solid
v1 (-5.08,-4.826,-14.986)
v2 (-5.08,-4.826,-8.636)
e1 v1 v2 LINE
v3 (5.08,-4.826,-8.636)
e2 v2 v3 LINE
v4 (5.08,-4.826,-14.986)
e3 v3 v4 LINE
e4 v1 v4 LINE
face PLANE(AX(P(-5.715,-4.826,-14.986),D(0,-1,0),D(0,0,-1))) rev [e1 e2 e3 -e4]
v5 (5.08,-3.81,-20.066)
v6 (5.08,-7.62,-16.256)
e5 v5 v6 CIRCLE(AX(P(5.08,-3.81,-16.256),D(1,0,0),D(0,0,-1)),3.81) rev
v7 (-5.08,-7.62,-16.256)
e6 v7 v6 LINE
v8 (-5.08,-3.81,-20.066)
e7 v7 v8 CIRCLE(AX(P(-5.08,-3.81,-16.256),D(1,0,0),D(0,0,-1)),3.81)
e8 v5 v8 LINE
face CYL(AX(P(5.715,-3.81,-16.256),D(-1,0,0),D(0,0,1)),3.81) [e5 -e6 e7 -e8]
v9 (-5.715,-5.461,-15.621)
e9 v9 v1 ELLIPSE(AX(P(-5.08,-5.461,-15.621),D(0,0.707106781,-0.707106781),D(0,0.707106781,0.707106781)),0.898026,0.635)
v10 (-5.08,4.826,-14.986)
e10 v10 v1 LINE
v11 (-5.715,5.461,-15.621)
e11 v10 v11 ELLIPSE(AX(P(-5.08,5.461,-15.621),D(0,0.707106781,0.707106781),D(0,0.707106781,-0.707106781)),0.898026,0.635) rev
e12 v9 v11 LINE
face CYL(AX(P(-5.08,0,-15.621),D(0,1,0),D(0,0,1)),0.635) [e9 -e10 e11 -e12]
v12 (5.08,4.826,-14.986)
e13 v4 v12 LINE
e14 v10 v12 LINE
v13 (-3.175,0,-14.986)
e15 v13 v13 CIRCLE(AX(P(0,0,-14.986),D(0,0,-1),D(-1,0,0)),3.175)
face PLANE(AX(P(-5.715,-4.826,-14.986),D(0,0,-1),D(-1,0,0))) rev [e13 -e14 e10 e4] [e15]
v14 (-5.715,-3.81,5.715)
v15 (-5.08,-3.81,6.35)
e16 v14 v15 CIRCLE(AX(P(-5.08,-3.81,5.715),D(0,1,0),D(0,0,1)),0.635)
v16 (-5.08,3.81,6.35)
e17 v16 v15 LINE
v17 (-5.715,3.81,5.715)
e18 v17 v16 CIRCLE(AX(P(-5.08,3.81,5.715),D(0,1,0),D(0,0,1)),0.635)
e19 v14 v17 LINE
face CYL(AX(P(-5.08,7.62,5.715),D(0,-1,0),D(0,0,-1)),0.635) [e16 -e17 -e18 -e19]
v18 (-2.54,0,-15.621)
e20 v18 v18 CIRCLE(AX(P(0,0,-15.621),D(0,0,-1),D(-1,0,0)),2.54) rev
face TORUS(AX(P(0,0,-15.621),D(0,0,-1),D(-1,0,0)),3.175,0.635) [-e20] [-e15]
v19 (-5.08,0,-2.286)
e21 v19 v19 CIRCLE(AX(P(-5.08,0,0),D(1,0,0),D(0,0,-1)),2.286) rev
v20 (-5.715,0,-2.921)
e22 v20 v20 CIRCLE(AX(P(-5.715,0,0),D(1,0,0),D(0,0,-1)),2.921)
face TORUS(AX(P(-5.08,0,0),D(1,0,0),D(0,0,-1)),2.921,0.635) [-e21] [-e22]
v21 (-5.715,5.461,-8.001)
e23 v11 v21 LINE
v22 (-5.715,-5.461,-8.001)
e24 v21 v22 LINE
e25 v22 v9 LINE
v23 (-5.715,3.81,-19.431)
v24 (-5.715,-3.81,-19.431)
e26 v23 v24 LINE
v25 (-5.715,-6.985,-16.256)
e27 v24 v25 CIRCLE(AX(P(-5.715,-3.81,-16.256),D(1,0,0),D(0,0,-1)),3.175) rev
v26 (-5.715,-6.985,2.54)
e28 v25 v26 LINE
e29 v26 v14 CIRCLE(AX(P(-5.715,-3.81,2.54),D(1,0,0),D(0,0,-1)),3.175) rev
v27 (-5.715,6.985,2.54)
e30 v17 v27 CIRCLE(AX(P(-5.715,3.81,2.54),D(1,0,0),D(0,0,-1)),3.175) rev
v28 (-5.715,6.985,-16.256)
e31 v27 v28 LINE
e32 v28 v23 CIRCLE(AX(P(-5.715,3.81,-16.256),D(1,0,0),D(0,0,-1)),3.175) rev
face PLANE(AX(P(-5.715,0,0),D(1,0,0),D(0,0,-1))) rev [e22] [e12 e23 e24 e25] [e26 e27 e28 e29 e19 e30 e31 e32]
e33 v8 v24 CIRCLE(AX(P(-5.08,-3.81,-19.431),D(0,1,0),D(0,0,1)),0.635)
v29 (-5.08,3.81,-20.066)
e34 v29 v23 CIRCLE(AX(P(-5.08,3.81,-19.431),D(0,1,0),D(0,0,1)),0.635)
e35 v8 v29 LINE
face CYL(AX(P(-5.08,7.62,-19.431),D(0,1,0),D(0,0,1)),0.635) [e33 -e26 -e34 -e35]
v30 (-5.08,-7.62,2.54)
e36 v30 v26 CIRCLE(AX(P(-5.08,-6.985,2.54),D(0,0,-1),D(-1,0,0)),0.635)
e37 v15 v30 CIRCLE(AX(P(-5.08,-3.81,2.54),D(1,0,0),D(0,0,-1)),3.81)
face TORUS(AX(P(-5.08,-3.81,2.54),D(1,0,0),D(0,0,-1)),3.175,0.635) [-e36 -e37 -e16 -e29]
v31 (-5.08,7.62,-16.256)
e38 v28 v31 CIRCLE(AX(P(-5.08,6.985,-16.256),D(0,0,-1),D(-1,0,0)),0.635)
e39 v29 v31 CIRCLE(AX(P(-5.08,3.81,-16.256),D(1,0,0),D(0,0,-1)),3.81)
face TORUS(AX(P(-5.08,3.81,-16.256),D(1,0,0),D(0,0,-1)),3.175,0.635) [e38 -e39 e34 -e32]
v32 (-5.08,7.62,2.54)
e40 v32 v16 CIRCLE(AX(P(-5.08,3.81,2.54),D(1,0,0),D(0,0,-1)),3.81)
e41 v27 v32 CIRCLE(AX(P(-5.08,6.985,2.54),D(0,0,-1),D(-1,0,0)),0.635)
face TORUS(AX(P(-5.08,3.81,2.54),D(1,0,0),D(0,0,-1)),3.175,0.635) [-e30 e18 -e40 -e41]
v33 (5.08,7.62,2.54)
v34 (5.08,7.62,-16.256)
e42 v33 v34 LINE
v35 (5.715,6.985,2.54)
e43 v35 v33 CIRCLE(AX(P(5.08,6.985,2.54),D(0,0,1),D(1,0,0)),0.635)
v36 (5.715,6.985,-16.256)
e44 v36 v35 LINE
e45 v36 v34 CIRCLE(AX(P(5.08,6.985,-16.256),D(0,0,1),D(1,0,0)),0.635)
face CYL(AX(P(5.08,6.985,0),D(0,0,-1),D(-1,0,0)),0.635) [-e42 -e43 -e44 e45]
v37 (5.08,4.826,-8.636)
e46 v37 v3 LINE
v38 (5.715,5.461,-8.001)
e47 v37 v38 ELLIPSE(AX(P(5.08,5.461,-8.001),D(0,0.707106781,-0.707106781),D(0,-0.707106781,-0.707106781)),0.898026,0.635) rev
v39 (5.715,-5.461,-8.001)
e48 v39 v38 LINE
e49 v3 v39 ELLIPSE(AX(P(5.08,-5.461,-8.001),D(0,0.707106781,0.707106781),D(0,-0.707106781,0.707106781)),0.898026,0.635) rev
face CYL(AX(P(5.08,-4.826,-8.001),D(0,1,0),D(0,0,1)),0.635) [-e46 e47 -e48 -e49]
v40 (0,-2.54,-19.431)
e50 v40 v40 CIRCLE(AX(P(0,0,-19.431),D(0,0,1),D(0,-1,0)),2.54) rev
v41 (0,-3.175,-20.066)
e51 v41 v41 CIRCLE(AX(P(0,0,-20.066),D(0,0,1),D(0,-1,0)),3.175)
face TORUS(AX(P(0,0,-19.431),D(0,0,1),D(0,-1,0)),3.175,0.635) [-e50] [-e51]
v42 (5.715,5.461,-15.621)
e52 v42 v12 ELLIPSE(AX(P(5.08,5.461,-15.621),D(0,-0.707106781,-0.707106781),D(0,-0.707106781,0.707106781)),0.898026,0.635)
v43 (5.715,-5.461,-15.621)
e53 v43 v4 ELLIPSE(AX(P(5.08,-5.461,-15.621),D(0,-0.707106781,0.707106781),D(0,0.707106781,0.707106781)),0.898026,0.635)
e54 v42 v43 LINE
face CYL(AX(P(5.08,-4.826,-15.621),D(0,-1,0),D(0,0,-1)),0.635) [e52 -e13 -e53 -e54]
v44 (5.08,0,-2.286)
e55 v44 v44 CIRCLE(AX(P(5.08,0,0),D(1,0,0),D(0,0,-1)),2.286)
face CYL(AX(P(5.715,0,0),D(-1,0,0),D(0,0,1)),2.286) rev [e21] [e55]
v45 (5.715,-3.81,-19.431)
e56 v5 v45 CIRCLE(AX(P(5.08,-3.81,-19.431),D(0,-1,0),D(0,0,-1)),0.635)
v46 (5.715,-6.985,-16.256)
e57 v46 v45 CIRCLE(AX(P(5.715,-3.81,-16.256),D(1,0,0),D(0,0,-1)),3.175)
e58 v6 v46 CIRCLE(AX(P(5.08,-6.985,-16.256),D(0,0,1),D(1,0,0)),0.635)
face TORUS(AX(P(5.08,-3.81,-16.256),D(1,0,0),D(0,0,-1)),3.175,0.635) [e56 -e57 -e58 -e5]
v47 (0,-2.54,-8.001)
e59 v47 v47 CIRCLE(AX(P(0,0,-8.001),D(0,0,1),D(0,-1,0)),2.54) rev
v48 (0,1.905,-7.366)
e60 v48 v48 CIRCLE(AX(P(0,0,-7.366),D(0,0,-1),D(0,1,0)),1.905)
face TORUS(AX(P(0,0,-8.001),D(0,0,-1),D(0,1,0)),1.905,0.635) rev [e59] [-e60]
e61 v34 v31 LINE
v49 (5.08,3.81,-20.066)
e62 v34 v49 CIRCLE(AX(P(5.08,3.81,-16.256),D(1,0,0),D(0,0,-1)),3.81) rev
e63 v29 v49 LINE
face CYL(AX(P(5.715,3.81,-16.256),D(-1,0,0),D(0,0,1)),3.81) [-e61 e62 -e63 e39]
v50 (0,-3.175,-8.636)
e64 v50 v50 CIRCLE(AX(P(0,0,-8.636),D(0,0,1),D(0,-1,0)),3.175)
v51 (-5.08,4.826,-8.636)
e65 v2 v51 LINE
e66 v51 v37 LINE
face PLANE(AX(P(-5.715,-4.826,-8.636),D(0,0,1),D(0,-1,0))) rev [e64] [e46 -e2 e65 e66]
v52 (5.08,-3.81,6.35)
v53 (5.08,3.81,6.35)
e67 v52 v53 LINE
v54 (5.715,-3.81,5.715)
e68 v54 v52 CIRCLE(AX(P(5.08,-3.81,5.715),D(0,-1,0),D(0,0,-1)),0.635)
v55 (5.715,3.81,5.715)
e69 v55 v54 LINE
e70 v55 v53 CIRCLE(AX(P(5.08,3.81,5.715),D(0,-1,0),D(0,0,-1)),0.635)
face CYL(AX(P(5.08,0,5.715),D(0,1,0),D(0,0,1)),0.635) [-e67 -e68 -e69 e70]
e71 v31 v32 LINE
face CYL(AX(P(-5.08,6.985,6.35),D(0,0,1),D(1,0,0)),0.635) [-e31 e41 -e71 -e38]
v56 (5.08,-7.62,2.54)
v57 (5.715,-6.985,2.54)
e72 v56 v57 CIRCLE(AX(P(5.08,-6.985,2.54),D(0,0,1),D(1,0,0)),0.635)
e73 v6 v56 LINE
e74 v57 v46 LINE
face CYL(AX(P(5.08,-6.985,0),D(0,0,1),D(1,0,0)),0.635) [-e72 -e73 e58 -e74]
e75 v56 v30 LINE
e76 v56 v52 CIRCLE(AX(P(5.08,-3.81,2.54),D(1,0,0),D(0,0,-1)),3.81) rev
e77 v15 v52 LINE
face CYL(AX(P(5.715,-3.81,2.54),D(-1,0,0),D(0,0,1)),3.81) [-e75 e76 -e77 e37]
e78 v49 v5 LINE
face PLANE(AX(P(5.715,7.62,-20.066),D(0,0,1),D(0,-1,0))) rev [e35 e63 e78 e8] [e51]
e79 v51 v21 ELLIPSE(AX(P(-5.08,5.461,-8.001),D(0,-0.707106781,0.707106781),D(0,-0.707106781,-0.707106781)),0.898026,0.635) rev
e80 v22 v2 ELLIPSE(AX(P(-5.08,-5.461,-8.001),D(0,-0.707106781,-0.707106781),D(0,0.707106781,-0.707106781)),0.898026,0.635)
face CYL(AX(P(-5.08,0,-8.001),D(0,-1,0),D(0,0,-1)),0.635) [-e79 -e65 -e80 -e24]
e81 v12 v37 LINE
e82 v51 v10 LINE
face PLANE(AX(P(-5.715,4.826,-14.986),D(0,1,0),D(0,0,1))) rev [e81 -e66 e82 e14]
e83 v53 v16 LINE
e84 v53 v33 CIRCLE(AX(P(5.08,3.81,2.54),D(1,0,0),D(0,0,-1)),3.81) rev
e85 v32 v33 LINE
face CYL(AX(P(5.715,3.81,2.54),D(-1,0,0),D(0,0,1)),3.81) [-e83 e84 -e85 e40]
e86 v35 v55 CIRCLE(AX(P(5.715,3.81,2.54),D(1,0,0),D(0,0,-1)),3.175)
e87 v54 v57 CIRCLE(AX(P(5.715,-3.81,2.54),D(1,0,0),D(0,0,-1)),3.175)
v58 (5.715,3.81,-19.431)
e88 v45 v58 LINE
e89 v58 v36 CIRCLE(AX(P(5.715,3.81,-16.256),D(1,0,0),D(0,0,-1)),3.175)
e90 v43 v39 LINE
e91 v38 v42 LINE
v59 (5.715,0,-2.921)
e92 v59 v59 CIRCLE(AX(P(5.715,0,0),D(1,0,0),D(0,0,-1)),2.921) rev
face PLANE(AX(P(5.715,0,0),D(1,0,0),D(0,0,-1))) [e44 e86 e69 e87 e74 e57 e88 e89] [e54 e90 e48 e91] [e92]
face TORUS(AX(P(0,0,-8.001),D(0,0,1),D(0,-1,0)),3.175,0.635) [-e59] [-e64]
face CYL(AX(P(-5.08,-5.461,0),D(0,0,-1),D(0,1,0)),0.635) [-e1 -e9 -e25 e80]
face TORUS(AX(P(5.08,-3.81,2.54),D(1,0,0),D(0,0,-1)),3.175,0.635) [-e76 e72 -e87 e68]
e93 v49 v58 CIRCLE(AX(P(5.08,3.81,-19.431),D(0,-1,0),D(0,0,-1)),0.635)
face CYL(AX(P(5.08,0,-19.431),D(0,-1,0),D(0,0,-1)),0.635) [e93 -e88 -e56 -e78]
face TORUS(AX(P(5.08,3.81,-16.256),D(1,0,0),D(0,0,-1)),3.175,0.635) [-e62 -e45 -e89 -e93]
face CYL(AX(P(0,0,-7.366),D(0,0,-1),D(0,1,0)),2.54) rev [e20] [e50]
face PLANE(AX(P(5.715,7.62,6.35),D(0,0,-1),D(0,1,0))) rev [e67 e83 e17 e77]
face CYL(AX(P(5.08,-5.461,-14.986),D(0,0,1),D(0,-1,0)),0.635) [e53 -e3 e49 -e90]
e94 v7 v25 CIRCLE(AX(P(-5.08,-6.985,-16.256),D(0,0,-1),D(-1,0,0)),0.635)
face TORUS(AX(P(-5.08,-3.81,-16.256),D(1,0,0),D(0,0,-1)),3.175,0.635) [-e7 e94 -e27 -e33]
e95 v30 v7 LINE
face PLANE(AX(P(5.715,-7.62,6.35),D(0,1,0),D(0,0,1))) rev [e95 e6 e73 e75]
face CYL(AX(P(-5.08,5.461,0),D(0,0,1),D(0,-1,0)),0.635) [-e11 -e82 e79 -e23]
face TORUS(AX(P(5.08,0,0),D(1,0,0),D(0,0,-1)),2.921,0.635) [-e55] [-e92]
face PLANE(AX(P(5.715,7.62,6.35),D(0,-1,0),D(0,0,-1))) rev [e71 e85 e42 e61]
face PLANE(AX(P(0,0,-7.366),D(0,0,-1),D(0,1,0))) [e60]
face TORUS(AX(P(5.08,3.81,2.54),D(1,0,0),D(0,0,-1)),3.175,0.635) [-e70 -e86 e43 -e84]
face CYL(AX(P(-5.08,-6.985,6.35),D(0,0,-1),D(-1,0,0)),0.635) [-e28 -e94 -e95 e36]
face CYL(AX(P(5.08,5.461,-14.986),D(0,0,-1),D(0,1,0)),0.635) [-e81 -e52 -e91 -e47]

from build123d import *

# Parameters (mm, degrees)
SKETCH1_W           = 26.416
SKETCH1_H           = 15.24
SKETCH1_R           = 2.286
BOSS_EXTRUDE1_DEPTH = 5.715
SKETCH2_R           = 2.54
CUT_EXTRUDE1_DEPTH  = 12.7
FILLET1_R           = 3.81
SKETCH3_W           = 6.35
SKETCH3_H           = 9.652
CUT_EXTRUDE2_DEPTH  = 25.317764206
FILLET2_R           = 0.635
FILLET3_R           = 0.635


with BuildPart() as part:
    # Sketch1 → Boss-Extrude1 (new, symmetric)
    with BuildSketch(Plane(origin=(0, 0, 0), x_dir=(0, 0, -1), z_dir=(1, 0, 0))):
        with Locations((6.858, 0)):
            Rectangle(SKETCH1_W, SKETCH1_H)
        Circle(SKETCH1_R, mode=Mode.SUBTRACT)
    extrude(amount=BOSS_EXTRUDE1_DEPTH, both=True)

    # Sketch2 → Cut-Extrude1 (cut)
    with BuildSketch(Plane(origin=(0, 0, -20.066), x_dir=(-1, 0, 0), z_dir=(0, 0, -1))):
        with Locations(Location((0, 0, 0), (0, 0, 90))):
            Circle(SKETCH2_R)
    extrude(amount=-CUT_EXTRUDE1_DEPTH, mode=Mode.SUBTRACT)

    # Fillet1
    fillet1_edges = [part.edges().sort_by_distance(p)[0] for p in [
        (0, 7.62, 6.35),
        (0, 7.62, -20.066),
        (0, -7.62, -20.066),
        (0, -7.62, 6.35),
    ]]
    fillet(fillet1_edges, radius=FILLET1_R)

    # Sketch3 → Cut-Extrude2 (cut, through all)
    with BuildSketch(Plane(origin=(5.715, 0, 0), x_dir=(0, 0, -1), z_dir=(1, 0, 0))):
        with Locations((11.811, 0)):
            Rectangle(SKETCH3_W, SKETCH3_H)
    extrude(amount=-CUT_EXTRUDE2_DEPTH, mode=Mode.SUBTRACT)

    # Fillet2
    fillet2_edges = [part.edges().sort_by_distance(p)[0] for p in [
        (-5.715, 0, 2.286),
        (5.715, 0, 2.286),
        (-5.715, 0, -20.066),
        (5.715, 0, -20.066),
        (-5.715, 0, 6.35),
        (-5.715, 7.62, -6.858),
        (-5.715, -7.62, -6.858),
        (-5.715, -6.504076836, 5.234076836),
        (-5.715, 6.504076836, 5.234076836),
        (-5.715, 6.504076836, -18.950076836),
        (-5.715, -6.504076836, -18.950076836),
        (5.715, -7.62, -6.858),
        (5.715, 0, 6.35),
        (5.715, 7.62, -6.858),
        (5.715, -6.504076836, 5.234076836),
        (5.715, 6.504076836, 5.234076836),
        (5.715, 6.504076836, -18.950076836),
        (5.715, -6.504076836, -18.950076836),
        (-5.715, 0, -8.636),
        (-5.715, 0, -14.986),
        (-5.715, 4.826, -11.811),
        (-5.715, -4.826, -11.811),
        (5.715, 0, -8.636),
        (5.715, -4.826, -11.811),
        (5.715, 0, -14.986),
        (5.715, 4.826, -11.811),
    ]]
    fillet(fillet2_edges, radius=FILLET2_R)

    # Fillet3
    fillet3_edges = [part.edges().sort_by_distance(p)[0] for p in [
        (0, -2.54, -7.366),
        (0, -2.54, -20.066),
        (0, -2.54, -8.636),
        (0, -2.54, -14.986),
    ]]
    fillet(fillet3_edges, radius=FILLET3_R - 0.0001)  # a hair under: the kernel refuses the full size


solid = part.part
